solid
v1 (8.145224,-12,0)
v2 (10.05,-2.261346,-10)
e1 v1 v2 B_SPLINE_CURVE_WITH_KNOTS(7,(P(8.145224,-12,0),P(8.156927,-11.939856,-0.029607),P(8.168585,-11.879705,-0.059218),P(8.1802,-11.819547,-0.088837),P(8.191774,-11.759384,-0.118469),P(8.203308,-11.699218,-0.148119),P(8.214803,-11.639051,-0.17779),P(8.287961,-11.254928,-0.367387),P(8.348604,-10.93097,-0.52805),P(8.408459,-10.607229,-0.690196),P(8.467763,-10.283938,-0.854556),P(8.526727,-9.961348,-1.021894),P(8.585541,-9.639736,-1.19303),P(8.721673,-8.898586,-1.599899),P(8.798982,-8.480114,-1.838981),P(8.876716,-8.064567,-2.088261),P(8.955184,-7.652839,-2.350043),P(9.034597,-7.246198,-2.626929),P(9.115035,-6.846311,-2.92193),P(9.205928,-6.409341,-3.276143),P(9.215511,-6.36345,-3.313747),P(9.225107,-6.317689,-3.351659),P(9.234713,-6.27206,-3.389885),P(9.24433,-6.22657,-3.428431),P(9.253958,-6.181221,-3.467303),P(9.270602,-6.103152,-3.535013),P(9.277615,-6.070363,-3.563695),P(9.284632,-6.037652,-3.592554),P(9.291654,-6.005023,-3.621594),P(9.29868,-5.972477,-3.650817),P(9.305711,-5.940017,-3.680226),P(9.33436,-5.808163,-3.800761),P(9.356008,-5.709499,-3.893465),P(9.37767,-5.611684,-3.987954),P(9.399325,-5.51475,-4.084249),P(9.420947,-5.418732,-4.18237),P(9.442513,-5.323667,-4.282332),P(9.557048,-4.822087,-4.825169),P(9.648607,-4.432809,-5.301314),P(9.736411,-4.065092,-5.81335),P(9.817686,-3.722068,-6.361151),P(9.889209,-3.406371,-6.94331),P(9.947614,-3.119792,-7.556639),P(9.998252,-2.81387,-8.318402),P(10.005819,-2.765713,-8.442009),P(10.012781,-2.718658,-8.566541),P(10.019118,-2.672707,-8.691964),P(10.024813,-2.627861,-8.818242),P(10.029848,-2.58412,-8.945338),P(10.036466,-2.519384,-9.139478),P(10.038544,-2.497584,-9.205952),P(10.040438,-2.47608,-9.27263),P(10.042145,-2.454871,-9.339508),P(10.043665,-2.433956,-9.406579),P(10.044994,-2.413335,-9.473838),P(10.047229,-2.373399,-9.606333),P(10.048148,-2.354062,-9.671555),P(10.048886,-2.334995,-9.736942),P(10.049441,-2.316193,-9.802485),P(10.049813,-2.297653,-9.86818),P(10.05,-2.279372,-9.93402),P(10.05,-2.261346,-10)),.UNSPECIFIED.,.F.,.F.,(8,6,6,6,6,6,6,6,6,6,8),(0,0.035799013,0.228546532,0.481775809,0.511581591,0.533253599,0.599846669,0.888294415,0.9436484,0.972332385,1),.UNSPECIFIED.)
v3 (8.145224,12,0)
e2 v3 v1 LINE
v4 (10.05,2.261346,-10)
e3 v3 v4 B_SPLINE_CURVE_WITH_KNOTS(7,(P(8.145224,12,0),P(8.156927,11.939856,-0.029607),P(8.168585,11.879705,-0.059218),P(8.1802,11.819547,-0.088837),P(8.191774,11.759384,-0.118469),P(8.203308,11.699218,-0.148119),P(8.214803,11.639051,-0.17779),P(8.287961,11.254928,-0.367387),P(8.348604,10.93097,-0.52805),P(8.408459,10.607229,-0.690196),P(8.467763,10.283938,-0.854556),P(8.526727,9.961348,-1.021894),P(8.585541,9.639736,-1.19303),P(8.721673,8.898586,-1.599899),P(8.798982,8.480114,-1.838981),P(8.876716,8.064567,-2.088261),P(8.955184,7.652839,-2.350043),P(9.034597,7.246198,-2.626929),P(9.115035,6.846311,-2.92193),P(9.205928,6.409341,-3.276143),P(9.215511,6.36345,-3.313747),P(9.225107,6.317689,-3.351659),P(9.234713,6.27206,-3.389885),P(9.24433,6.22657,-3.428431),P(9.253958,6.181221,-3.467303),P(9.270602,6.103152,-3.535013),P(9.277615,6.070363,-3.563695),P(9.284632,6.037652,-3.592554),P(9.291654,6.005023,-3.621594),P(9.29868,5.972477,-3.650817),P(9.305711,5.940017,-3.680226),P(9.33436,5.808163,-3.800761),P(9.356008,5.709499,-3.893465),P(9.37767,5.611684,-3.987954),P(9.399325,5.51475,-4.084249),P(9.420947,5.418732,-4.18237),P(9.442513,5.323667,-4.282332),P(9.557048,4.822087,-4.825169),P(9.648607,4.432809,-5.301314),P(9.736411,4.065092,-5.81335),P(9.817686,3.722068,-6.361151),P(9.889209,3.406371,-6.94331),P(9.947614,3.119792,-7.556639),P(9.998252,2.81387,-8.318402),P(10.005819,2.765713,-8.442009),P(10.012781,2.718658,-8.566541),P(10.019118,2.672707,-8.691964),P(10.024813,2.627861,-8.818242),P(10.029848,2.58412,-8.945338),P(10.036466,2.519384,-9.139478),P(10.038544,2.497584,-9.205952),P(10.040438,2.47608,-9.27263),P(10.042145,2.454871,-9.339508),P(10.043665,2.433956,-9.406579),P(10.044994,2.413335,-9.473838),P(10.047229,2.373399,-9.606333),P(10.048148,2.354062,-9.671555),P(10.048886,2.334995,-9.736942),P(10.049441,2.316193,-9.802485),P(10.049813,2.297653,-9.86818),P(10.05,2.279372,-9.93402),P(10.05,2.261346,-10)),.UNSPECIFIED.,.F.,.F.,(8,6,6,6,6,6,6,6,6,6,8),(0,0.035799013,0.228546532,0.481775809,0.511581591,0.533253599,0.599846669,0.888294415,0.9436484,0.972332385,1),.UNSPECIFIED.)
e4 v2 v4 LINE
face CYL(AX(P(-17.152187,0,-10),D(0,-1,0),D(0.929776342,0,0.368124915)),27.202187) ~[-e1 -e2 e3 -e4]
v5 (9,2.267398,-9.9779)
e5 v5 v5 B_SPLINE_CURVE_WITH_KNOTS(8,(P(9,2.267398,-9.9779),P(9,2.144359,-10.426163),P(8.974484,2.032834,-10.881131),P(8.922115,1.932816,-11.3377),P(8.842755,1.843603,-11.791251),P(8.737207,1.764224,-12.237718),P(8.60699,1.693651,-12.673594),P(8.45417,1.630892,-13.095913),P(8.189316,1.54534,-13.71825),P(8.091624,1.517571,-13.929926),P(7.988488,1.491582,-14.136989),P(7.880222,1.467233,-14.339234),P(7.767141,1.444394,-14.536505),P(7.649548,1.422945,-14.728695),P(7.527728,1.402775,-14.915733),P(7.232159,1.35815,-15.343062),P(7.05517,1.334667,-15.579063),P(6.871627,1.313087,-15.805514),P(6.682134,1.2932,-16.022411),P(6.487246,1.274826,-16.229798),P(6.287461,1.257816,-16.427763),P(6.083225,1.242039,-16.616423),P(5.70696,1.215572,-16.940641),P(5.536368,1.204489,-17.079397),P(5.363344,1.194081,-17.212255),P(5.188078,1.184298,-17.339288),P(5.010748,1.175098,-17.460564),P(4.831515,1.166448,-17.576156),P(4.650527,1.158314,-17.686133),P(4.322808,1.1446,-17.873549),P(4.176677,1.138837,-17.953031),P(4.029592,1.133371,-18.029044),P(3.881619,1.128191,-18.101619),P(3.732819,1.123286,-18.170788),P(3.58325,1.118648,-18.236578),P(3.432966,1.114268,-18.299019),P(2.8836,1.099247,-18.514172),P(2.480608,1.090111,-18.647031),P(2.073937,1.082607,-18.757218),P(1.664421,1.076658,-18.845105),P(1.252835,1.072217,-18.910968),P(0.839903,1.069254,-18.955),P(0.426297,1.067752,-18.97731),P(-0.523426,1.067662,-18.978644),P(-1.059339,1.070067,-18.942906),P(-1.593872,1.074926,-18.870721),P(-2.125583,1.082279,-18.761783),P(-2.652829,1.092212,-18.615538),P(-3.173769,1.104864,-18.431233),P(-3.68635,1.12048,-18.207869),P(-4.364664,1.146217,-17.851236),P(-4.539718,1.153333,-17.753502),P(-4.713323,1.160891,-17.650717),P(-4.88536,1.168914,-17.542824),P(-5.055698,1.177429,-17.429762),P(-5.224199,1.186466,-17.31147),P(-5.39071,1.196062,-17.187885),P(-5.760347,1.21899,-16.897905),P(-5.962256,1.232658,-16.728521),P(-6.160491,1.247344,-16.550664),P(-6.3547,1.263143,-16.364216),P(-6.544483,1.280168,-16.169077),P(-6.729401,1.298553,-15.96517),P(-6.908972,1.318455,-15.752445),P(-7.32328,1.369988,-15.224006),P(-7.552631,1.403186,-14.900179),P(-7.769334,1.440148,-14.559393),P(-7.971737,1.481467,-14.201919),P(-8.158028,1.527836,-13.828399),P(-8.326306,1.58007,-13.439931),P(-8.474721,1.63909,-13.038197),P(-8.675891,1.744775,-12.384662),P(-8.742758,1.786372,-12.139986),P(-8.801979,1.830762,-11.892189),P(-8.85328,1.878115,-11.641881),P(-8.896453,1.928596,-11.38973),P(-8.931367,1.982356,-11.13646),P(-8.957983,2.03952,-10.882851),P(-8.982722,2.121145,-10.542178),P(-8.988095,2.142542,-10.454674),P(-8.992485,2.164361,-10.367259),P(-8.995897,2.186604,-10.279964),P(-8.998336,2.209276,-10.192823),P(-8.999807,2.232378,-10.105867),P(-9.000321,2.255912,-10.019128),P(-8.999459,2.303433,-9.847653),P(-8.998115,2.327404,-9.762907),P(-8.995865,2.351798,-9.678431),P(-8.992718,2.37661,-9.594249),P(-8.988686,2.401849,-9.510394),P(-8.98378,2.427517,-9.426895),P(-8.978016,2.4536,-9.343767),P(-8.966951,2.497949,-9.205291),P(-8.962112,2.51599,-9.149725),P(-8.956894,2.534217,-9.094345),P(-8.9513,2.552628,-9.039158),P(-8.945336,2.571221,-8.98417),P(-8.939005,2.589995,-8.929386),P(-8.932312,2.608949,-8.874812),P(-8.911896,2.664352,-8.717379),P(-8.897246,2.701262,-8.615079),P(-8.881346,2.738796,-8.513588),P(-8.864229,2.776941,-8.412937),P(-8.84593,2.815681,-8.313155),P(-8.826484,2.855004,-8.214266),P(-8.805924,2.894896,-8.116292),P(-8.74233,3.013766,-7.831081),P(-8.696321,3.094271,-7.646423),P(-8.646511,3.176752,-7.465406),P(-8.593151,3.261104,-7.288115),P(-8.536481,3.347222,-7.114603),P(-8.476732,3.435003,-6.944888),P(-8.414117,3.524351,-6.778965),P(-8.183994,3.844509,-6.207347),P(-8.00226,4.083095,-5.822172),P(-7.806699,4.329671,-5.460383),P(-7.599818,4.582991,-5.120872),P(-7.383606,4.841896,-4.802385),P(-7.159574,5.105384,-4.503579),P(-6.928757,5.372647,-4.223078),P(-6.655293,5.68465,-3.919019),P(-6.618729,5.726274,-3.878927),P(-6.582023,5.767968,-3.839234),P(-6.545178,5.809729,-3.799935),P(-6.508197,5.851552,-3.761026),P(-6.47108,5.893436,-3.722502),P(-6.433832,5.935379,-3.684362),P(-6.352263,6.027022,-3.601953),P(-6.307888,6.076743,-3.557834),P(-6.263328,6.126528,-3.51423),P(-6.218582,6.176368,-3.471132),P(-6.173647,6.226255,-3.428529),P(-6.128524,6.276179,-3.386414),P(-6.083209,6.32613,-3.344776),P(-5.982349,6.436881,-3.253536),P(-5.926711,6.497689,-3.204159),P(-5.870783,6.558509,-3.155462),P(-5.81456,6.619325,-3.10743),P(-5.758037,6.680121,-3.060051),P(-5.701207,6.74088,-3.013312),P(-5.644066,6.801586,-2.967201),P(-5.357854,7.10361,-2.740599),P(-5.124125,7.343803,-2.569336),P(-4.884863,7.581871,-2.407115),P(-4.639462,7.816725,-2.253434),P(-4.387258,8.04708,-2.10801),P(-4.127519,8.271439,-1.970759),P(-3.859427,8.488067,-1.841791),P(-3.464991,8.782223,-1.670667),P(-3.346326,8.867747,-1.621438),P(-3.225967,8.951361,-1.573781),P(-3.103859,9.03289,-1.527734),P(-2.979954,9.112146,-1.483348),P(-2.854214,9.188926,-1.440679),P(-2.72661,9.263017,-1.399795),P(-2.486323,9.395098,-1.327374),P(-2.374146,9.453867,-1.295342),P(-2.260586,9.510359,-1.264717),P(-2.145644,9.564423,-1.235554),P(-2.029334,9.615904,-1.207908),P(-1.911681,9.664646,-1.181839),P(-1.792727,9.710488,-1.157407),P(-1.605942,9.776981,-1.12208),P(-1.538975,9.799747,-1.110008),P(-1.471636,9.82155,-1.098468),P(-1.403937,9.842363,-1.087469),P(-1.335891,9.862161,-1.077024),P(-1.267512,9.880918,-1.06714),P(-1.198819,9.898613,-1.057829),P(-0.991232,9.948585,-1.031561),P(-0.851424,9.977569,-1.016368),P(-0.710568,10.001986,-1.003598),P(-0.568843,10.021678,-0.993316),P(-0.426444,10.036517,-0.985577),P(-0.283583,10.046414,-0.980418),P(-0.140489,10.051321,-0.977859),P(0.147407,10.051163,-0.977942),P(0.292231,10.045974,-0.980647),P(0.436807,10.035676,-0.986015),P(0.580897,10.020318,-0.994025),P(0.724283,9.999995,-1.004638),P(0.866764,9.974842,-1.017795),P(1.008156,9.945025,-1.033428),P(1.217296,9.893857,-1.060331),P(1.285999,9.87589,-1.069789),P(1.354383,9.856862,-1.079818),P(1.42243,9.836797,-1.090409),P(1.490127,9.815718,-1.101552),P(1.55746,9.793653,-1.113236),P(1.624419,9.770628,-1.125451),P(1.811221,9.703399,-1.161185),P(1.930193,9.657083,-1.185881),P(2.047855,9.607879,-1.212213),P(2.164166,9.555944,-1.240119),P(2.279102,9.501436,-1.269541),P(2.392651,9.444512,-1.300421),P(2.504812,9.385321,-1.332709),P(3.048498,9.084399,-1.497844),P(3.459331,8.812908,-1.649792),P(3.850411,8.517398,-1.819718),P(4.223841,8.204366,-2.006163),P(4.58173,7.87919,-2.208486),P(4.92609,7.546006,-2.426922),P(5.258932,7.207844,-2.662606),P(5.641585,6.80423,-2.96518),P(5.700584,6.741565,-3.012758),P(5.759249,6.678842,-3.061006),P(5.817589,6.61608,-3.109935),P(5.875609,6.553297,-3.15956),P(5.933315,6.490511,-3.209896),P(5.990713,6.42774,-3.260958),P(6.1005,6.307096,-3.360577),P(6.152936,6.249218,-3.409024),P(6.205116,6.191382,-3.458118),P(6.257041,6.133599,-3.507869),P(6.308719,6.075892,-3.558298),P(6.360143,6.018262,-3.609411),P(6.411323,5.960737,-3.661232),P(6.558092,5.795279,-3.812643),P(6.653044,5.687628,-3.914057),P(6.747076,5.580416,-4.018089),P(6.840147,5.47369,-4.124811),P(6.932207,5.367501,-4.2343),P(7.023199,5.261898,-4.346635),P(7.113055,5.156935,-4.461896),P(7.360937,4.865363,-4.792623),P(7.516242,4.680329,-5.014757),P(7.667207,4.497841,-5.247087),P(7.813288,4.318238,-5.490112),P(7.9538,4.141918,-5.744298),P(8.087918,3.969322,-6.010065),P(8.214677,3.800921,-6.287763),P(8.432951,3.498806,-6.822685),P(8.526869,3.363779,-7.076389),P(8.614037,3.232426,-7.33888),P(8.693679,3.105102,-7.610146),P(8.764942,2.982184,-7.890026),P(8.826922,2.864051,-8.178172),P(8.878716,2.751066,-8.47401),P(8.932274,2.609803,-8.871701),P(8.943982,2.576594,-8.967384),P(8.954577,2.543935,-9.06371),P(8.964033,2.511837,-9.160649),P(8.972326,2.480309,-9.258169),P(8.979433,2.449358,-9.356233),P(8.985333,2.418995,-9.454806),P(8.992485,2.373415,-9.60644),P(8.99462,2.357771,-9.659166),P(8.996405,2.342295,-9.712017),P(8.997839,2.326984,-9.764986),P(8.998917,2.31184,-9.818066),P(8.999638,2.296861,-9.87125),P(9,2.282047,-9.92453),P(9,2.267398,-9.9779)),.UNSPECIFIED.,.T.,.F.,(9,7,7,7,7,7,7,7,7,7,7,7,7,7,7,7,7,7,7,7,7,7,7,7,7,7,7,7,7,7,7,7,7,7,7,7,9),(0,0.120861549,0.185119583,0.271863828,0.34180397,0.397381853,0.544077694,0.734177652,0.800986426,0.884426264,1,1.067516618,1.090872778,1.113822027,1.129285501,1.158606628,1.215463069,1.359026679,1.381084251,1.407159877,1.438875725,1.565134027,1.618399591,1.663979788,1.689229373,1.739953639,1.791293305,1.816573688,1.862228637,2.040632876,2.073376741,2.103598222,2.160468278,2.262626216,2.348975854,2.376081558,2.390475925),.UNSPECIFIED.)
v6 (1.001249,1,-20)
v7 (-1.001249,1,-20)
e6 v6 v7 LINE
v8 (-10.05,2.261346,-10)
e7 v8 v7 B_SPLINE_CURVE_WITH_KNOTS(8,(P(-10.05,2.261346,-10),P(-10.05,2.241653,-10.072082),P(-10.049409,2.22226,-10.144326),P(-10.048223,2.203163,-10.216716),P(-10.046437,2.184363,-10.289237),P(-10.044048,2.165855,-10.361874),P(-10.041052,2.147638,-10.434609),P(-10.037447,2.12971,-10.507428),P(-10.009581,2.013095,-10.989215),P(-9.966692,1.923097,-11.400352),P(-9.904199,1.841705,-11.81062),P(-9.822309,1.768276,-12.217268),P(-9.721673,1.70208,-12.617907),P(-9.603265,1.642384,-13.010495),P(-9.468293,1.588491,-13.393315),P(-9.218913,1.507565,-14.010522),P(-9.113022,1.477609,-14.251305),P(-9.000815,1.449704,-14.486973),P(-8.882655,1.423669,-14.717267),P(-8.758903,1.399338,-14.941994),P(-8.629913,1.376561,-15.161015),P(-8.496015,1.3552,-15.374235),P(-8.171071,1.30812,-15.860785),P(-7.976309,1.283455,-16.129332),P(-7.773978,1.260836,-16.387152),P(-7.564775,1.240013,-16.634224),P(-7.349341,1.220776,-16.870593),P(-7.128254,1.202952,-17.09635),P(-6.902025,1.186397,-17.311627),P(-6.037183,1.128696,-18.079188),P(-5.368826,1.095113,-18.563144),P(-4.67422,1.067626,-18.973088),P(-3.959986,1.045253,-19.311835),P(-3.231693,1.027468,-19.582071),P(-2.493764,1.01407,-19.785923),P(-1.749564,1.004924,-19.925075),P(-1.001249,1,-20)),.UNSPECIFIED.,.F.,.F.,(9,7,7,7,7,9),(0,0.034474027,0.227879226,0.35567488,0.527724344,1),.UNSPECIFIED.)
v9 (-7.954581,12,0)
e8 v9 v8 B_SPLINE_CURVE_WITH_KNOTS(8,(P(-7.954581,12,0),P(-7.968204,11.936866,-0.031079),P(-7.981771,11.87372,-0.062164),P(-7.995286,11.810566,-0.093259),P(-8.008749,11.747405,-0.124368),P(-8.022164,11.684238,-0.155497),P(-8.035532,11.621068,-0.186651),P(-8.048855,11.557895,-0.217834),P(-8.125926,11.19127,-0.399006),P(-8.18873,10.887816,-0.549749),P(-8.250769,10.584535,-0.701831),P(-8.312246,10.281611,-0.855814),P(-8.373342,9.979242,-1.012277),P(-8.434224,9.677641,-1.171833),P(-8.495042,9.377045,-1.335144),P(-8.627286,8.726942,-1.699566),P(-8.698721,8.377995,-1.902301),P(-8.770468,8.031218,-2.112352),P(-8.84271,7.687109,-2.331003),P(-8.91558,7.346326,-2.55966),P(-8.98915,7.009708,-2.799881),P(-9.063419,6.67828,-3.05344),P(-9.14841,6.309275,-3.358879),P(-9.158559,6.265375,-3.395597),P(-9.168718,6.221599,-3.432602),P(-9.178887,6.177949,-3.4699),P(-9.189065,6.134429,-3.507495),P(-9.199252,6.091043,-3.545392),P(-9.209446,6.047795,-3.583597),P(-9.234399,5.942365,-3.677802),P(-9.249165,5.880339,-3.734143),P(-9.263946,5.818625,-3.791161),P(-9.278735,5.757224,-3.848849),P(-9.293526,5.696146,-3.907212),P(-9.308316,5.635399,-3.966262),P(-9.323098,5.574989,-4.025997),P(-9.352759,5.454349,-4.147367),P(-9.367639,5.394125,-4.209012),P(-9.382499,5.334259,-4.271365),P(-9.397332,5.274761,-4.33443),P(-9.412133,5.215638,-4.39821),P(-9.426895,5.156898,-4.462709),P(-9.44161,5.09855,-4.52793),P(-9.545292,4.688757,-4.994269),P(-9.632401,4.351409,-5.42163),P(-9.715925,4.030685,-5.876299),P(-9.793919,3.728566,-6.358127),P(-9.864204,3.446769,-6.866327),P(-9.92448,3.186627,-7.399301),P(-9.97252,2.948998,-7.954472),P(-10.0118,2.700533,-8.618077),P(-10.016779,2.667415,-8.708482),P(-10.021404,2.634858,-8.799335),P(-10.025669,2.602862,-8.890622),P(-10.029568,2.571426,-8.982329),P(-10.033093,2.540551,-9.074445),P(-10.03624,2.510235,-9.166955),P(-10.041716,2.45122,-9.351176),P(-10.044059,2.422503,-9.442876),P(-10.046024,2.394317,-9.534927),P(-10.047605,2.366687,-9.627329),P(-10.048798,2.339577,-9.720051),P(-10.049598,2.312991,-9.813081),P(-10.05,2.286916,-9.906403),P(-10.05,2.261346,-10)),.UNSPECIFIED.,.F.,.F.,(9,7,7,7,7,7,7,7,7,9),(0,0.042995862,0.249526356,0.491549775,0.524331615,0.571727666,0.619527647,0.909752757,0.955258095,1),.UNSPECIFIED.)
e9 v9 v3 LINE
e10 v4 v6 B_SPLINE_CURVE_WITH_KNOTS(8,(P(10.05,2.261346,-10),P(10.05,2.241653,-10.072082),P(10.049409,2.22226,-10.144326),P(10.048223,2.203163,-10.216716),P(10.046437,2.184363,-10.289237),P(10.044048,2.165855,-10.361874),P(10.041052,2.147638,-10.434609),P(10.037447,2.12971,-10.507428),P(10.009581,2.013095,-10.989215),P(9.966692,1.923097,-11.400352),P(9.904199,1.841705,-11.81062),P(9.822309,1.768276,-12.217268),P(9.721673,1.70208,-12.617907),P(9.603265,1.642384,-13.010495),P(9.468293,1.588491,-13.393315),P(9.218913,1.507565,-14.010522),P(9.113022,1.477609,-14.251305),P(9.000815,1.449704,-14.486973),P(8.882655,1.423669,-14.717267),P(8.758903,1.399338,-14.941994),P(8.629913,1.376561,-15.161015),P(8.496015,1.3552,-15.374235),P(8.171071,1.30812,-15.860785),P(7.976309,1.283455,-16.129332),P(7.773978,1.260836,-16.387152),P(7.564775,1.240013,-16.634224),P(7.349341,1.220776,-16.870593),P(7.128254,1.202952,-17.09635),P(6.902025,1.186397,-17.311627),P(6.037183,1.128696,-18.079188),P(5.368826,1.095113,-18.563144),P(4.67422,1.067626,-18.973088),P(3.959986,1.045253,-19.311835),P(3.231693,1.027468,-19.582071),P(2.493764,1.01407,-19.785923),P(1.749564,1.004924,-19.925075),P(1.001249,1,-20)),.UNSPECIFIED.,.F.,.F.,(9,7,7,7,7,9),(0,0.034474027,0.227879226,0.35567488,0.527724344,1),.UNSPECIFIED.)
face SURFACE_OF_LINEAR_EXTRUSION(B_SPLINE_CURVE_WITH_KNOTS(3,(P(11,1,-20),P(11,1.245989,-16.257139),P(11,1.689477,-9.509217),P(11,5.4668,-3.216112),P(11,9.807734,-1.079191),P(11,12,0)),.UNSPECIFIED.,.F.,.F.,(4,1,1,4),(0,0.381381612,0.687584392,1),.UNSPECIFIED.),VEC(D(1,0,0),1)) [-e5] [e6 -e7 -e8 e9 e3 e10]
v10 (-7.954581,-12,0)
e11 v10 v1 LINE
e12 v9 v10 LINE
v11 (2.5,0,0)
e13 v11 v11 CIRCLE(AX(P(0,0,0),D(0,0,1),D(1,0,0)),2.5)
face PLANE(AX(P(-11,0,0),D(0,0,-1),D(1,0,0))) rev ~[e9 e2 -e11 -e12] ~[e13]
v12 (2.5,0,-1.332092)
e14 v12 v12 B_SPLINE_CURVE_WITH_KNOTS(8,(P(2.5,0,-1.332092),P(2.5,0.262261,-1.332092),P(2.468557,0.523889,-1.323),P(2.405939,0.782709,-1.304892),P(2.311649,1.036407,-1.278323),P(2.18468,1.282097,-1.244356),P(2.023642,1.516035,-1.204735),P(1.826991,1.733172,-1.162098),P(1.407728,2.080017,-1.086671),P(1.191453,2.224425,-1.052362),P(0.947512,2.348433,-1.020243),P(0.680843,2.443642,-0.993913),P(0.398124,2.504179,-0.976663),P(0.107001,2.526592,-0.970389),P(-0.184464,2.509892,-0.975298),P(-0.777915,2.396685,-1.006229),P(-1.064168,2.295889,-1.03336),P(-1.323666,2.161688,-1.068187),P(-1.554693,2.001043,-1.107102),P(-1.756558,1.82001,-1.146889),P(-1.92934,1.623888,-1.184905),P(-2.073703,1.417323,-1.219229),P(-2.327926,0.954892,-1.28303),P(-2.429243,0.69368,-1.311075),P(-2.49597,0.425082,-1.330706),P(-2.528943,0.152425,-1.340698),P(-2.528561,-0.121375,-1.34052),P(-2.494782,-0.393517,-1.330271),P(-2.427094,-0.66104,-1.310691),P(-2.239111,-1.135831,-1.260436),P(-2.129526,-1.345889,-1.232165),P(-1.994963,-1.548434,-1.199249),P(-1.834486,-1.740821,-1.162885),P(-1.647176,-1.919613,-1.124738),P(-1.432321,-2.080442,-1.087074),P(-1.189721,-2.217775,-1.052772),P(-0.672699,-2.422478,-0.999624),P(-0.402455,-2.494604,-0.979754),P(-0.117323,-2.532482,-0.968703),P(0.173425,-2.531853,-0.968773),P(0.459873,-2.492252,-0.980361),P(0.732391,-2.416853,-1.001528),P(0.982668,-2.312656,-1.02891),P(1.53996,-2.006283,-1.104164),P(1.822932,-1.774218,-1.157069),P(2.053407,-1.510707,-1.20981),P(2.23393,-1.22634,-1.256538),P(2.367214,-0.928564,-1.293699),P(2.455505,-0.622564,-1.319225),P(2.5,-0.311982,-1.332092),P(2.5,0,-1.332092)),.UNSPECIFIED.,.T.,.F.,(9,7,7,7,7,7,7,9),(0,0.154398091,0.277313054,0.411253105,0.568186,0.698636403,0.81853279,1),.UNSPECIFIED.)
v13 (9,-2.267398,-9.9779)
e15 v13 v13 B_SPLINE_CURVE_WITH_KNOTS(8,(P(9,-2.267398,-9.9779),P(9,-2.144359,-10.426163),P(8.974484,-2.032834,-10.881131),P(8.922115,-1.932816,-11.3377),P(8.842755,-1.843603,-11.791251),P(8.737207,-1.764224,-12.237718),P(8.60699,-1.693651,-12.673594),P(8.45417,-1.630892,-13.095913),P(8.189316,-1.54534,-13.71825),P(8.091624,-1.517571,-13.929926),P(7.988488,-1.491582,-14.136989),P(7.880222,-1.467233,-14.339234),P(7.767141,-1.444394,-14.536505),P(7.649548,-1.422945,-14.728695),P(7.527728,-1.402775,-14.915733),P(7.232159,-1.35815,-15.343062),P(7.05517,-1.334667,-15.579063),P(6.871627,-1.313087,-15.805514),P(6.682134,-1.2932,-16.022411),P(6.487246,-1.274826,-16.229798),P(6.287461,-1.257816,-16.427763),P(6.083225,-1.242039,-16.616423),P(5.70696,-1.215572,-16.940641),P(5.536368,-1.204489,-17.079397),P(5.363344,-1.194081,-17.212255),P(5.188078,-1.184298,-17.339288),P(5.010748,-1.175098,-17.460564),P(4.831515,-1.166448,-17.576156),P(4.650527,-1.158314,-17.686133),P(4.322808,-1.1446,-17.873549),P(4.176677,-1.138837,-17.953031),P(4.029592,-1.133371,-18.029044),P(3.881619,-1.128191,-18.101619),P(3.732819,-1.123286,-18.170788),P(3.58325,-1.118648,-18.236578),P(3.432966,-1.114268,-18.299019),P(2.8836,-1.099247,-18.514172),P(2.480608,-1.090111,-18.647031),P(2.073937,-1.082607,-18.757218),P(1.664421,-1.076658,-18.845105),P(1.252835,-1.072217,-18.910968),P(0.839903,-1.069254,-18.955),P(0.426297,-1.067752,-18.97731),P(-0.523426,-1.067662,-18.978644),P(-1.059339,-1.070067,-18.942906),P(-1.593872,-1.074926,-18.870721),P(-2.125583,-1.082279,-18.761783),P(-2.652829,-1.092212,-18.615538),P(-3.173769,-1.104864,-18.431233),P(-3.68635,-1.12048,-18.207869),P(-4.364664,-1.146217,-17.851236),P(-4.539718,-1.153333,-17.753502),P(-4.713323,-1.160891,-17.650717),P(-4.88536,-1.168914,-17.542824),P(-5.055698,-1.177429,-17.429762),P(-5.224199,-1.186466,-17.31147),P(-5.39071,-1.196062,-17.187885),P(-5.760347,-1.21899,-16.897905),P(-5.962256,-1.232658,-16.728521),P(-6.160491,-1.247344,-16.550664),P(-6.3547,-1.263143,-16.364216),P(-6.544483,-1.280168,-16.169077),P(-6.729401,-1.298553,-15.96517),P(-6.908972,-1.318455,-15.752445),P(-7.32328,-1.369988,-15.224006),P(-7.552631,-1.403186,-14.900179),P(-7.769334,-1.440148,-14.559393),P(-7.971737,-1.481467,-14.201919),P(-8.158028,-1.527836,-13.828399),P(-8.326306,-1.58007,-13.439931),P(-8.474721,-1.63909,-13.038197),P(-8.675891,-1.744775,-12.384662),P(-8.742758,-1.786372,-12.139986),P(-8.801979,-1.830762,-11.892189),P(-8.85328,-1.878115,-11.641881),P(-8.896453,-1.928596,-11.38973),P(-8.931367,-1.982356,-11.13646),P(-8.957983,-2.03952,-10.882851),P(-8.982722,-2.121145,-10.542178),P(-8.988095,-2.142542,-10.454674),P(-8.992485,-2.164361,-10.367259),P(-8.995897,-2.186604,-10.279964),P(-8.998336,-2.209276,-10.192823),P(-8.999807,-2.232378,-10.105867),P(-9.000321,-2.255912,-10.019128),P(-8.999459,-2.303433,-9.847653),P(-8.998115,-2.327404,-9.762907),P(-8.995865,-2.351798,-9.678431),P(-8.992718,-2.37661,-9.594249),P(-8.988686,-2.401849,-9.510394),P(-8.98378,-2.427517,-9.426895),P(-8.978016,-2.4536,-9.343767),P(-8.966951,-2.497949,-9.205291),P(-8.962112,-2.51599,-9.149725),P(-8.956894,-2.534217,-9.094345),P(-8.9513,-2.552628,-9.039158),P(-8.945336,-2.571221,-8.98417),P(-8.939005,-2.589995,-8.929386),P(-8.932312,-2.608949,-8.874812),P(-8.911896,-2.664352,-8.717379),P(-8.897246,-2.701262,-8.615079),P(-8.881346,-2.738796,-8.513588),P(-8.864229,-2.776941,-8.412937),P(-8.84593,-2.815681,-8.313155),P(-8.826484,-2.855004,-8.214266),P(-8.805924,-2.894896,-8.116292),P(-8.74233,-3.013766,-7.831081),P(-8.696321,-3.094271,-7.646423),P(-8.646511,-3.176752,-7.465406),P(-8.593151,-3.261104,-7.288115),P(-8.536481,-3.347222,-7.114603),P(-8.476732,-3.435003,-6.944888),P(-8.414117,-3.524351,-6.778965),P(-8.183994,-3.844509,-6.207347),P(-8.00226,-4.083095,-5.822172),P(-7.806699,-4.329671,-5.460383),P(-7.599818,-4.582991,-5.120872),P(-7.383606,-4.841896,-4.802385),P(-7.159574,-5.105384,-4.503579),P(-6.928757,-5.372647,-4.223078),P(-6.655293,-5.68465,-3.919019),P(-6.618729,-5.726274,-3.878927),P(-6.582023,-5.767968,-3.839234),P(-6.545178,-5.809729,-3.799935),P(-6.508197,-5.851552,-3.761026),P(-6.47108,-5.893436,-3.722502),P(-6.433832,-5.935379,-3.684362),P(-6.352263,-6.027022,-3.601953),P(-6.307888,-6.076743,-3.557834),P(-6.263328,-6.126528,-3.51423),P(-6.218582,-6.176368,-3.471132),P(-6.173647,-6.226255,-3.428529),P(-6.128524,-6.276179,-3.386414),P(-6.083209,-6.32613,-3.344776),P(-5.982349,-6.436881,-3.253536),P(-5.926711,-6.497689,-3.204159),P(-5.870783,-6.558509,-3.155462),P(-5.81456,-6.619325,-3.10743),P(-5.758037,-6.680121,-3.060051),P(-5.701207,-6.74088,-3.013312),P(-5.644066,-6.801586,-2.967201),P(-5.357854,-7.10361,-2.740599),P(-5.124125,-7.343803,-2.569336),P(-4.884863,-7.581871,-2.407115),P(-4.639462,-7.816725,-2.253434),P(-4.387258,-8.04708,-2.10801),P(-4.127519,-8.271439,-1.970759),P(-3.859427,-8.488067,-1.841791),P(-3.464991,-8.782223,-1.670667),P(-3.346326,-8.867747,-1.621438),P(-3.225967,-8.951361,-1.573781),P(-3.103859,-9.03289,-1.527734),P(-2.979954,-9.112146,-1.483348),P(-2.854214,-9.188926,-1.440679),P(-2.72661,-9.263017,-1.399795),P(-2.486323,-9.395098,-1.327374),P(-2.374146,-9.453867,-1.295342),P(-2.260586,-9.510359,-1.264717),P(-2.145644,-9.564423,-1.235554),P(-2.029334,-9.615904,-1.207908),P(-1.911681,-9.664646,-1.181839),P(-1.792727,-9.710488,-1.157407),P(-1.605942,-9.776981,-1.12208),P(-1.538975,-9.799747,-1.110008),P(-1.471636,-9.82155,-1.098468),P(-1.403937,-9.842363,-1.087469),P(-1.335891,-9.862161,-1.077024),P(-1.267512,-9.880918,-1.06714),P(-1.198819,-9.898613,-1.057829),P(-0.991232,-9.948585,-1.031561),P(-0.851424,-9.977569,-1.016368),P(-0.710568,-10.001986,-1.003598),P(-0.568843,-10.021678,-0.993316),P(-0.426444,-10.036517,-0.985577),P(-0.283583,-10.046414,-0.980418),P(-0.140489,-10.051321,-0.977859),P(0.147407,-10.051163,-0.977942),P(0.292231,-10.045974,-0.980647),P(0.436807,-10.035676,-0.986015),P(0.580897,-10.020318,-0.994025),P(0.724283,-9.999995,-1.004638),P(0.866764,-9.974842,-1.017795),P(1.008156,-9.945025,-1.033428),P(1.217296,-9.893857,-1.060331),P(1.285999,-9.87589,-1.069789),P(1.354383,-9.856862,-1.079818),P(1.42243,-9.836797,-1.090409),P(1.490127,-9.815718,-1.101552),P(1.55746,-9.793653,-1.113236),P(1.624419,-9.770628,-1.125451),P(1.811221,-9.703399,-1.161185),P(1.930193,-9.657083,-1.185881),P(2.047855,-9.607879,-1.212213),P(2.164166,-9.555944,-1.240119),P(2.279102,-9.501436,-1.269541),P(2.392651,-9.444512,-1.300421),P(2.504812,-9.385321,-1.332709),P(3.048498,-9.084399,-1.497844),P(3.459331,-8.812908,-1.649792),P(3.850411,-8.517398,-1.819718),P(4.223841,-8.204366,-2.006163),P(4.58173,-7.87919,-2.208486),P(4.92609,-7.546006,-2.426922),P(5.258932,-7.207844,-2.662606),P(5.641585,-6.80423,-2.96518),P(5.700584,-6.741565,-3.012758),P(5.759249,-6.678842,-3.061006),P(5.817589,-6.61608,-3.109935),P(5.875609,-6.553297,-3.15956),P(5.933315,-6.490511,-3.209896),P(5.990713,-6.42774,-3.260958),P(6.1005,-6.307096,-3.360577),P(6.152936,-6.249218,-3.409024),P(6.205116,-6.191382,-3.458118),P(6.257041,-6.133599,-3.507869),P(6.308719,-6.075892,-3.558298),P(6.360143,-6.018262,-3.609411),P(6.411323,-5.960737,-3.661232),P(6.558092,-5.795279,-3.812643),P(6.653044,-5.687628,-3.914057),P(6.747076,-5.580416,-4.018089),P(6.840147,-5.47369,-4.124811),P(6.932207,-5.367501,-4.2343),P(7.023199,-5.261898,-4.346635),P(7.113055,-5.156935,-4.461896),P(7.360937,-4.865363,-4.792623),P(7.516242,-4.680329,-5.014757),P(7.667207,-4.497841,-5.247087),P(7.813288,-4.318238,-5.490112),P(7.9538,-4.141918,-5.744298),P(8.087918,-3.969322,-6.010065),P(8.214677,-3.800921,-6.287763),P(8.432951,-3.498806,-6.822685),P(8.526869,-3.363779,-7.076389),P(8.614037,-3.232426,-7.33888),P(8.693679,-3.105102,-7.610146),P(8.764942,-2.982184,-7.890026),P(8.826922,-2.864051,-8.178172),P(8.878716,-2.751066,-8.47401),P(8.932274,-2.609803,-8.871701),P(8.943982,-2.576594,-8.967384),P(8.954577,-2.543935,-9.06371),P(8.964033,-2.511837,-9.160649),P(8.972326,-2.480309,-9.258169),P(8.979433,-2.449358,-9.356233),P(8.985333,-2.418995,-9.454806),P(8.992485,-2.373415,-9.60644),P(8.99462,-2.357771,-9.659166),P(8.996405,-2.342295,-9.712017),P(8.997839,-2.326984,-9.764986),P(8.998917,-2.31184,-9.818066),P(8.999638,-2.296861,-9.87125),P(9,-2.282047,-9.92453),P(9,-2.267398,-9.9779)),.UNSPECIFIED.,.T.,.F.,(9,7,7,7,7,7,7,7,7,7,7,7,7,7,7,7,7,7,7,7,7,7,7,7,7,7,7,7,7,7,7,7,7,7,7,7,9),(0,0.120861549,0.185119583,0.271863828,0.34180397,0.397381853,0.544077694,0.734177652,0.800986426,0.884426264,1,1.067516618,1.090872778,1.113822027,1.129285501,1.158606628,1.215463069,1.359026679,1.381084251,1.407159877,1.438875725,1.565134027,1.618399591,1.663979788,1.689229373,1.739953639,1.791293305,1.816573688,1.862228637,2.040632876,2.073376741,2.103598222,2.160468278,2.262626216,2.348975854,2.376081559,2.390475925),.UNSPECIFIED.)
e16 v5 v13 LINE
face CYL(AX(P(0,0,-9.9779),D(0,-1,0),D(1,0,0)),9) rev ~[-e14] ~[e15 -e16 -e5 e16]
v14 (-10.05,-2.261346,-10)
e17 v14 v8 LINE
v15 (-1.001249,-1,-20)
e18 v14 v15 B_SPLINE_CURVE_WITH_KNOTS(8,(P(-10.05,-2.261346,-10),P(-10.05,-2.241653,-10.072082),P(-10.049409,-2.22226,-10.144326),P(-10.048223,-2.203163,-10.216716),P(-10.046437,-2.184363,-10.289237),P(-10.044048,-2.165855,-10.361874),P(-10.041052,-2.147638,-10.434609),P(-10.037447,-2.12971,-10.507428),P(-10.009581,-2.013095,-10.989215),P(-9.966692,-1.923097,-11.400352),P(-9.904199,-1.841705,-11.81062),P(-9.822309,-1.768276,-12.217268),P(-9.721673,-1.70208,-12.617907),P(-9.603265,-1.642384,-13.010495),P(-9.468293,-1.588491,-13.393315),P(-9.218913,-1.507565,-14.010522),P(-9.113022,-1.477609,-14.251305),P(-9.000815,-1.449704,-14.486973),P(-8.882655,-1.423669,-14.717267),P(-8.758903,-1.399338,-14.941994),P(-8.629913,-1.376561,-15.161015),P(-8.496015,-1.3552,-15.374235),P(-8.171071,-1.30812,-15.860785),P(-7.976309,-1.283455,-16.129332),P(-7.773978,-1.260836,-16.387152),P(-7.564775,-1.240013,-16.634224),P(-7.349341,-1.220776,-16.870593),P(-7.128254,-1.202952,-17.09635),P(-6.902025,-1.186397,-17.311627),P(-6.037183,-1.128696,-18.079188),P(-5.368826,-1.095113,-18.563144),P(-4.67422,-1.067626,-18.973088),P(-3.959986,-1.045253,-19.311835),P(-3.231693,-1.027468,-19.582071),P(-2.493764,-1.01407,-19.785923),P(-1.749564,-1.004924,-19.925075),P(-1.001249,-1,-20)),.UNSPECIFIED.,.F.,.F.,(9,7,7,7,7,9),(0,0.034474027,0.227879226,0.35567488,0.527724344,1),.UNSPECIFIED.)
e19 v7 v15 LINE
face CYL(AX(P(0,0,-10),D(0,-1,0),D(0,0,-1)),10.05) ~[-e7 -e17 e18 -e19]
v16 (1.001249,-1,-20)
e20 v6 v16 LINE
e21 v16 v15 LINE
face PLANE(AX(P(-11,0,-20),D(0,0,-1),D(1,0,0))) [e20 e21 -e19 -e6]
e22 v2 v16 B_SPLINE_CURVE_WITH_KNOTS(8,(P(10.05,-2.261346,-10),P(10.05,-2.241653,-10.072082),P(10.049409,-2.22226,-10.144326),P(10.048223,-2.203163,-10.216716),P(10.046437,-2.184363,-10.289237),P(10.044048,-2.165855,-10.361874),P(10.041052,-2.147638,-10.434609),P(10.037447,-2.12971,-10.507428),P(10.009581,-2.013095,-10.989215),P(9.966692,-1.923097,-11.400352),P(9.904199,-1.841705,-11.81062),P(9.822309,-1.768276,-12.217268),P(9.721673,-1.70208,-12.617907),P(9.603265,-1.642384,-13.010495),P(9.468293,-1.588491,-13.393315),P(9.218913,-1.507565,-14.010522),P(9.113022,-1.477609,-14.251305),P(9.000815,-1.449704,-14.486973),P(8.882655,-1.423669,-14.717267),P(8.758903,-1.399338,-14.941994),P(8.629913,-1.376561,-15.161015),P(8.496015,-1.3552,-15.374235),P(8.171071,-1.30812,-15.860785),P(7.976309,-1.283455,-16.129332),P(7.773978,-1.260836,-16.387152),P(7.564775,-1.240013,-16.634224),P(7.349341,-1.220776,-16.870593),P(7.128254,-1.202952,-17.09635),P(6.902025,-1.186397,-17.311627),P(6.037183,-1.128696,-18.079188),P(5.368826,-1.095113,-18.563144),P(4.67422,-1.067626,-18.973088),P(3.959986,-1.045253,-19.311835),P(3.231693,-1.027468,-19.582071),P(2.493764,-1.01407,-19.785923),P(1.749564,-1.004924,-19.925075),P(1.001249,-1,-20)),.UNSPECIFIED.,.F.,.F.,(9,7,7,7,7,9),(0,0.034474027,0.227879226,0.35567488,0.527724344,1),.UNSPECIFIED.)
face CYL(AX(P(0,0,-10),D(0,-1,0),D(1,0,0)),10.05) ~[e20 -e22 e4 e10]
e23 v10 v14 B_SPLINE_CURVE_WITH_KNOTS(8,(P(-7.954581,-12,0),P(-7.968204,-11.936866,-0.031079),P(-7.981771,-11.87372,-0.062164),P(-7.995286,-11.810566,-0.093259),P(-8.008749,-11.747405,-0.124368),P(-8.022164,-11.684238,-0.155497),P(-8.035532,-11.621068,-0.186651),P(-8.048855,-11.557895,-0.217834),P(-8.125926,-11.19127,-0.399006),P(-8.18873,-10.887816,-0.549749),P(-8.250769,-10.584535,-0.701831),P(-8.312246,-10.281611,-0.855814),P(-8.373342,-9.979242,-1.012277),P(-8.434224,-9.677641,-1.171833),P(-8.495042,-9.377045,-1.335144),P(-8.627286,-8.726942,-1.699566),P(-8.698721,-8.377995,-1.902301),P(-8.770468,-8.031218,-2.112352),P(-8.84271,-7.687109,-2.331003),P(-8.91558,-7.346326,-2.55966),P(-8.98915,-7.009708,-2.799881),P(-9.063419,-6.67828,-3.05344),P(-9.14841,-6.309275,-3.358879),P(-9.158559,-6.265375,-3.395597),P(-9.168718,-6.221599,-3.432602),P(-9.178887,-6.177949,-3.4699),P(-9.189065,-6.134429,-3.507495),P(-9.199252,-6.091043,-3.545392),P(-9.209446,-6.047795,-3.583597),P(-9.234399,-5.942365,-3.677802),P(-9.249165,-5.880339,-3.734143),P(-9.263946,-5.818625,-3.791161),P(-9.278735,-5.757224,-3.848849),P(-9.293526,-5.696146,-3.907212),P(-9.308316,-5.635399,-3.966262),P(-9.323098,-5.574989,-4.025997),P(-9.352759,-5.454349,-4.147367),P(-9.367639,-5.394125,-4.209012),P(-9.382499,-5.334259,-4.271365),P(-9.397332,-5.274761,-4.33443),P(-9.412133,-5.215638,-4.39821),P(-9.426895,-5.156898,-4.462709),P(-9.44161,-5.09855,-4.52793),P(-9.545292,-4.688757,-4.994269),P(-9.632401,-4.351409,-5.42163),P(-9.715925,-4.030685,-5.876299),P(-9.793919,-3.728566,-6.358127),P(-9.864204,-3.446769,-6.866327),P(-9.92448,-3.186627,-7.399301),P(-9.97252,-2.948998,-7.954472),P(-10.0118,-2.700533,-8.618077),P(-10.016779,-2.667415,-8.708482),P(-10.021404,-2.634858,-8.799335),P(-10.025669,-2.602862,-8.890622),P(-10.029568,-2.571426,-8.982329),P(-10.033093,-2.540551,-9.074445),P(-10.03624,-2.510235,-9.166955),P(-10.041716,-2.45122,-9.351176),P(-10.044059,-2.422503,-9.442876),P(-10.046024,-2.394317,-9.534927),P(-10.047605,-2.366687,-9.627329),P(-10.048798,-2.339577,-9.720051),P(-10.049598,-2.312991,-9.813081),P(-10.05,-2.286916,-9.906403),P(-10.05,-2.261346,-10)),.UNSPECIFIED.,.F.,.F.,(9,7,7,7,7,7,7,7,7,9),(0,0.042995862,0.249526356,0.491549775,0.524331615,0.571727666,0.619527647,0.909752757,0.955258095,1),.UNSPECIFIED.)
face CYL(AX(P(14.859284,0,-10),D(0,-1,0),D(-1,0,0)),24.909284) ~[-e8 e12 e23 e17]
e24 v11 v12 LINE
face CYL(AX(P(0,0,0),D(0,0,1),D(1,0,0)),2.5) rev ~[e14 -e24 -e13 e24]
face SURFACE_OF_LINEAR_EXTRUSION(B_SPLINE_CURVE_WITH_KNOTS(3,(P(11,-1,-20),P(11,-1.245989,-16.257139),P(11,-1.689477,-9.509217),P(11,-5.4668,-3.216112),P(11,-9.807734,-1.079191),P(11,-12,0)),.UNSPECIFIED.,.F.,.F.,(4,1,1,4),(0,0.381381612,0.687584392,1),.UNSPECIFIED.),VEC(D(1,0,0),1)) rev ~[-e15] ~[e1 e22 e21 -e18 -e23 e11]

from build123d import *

# Parameters (mm, degrees)
F0_W     = 22
F0_H     = 20
F1_DEPTH = 12
F3_DEPTH = 25.4
F5_DEPTH = 12.7
F6_R     = 9
F7_DEPTH = 12.7
F8_R     = 2.5
F9_DEPTH = 5


with BuildPart() as f1:
    # F0 (on Front) → F1 (new body, symmetric)
    with BuildSketch(Plane.XZ):
        with Locations((0, -10)):
            Rectangle(F0_W, F0_H)
    extrude(amount=F1_DEPTH, both=True)

    # F2 (on face) → F3 (cut)
    with BuildSketch(Plane.YZ.offset(11)):
        with BuildLine():
            add(Edge.make_bspline(
                [(-1, -20), (-1.2459891412, -16.2571385999), (-1.6894774711, -9.5092173589), (-5.4667997235, -3.2161121648), (-9.8077344698, -1.0791911379), (-12, 0)],
                knots=[0, 0, 0, 0, 0.3813816119, 0.6875843918, 1, 1, 1, 1], degree=3))
            Line((-12, 0), (-12, -20))
            Line((-12, -20), (-1, -20))
        make_face()
        with BuildLine():
            Line((12, -20), (12, 0))
            add(Edge.make_bspline(
                [(1, -20), (1.2459891412, -16.2571385999), (1.6894774711, -9.5092173589), (5.4667997235, -3.2161121648), (9.8077344698, -1.0791911379), (12, 0)],
                knots=[0, 0, 0, 0, 0.3813816119, 0.6875843918, 1, 1, 1, 1], degree=3))
            Line((1, -20), (12, -20))
        make_face()
    extrude(amount=-F3_DEPTH, mode=Mode.SUBTRACT)

    # F4 (on Front) → F5 (cut, symmetric)
    with BuildSketch(Plane.XZ):
        with BuildLine():
            Line((11.243651621, 0), (8.1397629196, 0.0138028498))
            ThreePointArc((8.1397629196, 0.0138028498), (9.568173485, -4.902813197), (10.05, -10))
            ThreePointArc((10.05, -10), (7.1064231509, -17.1064231509), (0, -20.05))
            Line((0, -20.05), (11.243651621, -20.0490429997))
            Line((11.243651621, -20.0490429997), (11.243651621, 0))
        make_face()
        with BuildLine():
            ThreePointArc((-10.05, -10), (-9.5188754702, -4.8835783868), (-7.9481515297, 0.0146549369))
            Line((-7.9481515297, 0.0146549369), (-10.05, 0.0053081137))
            Line((-10.05, 0.0053081137), (-11.243651621, 0))
            Line((-11.243651621, 0), (-11.243651621, -20.0490429997))
            Line((-11.243651621, -20.0490429997), (0, -20.05))
            ThreePointArc((0, -20.05), (-7.1064231509, -17.1064231509), (-10.05, -10))
        make_face()
    extrude(amount=F5_DEPTH, both=True, mode=Mode.SUBTRACT)

    # F6 (on Front) → F7 (cut, symmetric)
    with BuildSketch(Plane.XZ):
        with Locations((0, -9.9779)):
            Circle(F6_R)
    extrude(amount=F7_DEPTH, both=True, mode=Mode.SUBTRACT)

    # F8 (on face) → F9 (cut)
    with BuildSketch(Plane.XY):
        Circle(F8_R)
    extrude(amount=-F9_DEPTH, mode=Mode.SUBTRACT)


solid = f1.part
